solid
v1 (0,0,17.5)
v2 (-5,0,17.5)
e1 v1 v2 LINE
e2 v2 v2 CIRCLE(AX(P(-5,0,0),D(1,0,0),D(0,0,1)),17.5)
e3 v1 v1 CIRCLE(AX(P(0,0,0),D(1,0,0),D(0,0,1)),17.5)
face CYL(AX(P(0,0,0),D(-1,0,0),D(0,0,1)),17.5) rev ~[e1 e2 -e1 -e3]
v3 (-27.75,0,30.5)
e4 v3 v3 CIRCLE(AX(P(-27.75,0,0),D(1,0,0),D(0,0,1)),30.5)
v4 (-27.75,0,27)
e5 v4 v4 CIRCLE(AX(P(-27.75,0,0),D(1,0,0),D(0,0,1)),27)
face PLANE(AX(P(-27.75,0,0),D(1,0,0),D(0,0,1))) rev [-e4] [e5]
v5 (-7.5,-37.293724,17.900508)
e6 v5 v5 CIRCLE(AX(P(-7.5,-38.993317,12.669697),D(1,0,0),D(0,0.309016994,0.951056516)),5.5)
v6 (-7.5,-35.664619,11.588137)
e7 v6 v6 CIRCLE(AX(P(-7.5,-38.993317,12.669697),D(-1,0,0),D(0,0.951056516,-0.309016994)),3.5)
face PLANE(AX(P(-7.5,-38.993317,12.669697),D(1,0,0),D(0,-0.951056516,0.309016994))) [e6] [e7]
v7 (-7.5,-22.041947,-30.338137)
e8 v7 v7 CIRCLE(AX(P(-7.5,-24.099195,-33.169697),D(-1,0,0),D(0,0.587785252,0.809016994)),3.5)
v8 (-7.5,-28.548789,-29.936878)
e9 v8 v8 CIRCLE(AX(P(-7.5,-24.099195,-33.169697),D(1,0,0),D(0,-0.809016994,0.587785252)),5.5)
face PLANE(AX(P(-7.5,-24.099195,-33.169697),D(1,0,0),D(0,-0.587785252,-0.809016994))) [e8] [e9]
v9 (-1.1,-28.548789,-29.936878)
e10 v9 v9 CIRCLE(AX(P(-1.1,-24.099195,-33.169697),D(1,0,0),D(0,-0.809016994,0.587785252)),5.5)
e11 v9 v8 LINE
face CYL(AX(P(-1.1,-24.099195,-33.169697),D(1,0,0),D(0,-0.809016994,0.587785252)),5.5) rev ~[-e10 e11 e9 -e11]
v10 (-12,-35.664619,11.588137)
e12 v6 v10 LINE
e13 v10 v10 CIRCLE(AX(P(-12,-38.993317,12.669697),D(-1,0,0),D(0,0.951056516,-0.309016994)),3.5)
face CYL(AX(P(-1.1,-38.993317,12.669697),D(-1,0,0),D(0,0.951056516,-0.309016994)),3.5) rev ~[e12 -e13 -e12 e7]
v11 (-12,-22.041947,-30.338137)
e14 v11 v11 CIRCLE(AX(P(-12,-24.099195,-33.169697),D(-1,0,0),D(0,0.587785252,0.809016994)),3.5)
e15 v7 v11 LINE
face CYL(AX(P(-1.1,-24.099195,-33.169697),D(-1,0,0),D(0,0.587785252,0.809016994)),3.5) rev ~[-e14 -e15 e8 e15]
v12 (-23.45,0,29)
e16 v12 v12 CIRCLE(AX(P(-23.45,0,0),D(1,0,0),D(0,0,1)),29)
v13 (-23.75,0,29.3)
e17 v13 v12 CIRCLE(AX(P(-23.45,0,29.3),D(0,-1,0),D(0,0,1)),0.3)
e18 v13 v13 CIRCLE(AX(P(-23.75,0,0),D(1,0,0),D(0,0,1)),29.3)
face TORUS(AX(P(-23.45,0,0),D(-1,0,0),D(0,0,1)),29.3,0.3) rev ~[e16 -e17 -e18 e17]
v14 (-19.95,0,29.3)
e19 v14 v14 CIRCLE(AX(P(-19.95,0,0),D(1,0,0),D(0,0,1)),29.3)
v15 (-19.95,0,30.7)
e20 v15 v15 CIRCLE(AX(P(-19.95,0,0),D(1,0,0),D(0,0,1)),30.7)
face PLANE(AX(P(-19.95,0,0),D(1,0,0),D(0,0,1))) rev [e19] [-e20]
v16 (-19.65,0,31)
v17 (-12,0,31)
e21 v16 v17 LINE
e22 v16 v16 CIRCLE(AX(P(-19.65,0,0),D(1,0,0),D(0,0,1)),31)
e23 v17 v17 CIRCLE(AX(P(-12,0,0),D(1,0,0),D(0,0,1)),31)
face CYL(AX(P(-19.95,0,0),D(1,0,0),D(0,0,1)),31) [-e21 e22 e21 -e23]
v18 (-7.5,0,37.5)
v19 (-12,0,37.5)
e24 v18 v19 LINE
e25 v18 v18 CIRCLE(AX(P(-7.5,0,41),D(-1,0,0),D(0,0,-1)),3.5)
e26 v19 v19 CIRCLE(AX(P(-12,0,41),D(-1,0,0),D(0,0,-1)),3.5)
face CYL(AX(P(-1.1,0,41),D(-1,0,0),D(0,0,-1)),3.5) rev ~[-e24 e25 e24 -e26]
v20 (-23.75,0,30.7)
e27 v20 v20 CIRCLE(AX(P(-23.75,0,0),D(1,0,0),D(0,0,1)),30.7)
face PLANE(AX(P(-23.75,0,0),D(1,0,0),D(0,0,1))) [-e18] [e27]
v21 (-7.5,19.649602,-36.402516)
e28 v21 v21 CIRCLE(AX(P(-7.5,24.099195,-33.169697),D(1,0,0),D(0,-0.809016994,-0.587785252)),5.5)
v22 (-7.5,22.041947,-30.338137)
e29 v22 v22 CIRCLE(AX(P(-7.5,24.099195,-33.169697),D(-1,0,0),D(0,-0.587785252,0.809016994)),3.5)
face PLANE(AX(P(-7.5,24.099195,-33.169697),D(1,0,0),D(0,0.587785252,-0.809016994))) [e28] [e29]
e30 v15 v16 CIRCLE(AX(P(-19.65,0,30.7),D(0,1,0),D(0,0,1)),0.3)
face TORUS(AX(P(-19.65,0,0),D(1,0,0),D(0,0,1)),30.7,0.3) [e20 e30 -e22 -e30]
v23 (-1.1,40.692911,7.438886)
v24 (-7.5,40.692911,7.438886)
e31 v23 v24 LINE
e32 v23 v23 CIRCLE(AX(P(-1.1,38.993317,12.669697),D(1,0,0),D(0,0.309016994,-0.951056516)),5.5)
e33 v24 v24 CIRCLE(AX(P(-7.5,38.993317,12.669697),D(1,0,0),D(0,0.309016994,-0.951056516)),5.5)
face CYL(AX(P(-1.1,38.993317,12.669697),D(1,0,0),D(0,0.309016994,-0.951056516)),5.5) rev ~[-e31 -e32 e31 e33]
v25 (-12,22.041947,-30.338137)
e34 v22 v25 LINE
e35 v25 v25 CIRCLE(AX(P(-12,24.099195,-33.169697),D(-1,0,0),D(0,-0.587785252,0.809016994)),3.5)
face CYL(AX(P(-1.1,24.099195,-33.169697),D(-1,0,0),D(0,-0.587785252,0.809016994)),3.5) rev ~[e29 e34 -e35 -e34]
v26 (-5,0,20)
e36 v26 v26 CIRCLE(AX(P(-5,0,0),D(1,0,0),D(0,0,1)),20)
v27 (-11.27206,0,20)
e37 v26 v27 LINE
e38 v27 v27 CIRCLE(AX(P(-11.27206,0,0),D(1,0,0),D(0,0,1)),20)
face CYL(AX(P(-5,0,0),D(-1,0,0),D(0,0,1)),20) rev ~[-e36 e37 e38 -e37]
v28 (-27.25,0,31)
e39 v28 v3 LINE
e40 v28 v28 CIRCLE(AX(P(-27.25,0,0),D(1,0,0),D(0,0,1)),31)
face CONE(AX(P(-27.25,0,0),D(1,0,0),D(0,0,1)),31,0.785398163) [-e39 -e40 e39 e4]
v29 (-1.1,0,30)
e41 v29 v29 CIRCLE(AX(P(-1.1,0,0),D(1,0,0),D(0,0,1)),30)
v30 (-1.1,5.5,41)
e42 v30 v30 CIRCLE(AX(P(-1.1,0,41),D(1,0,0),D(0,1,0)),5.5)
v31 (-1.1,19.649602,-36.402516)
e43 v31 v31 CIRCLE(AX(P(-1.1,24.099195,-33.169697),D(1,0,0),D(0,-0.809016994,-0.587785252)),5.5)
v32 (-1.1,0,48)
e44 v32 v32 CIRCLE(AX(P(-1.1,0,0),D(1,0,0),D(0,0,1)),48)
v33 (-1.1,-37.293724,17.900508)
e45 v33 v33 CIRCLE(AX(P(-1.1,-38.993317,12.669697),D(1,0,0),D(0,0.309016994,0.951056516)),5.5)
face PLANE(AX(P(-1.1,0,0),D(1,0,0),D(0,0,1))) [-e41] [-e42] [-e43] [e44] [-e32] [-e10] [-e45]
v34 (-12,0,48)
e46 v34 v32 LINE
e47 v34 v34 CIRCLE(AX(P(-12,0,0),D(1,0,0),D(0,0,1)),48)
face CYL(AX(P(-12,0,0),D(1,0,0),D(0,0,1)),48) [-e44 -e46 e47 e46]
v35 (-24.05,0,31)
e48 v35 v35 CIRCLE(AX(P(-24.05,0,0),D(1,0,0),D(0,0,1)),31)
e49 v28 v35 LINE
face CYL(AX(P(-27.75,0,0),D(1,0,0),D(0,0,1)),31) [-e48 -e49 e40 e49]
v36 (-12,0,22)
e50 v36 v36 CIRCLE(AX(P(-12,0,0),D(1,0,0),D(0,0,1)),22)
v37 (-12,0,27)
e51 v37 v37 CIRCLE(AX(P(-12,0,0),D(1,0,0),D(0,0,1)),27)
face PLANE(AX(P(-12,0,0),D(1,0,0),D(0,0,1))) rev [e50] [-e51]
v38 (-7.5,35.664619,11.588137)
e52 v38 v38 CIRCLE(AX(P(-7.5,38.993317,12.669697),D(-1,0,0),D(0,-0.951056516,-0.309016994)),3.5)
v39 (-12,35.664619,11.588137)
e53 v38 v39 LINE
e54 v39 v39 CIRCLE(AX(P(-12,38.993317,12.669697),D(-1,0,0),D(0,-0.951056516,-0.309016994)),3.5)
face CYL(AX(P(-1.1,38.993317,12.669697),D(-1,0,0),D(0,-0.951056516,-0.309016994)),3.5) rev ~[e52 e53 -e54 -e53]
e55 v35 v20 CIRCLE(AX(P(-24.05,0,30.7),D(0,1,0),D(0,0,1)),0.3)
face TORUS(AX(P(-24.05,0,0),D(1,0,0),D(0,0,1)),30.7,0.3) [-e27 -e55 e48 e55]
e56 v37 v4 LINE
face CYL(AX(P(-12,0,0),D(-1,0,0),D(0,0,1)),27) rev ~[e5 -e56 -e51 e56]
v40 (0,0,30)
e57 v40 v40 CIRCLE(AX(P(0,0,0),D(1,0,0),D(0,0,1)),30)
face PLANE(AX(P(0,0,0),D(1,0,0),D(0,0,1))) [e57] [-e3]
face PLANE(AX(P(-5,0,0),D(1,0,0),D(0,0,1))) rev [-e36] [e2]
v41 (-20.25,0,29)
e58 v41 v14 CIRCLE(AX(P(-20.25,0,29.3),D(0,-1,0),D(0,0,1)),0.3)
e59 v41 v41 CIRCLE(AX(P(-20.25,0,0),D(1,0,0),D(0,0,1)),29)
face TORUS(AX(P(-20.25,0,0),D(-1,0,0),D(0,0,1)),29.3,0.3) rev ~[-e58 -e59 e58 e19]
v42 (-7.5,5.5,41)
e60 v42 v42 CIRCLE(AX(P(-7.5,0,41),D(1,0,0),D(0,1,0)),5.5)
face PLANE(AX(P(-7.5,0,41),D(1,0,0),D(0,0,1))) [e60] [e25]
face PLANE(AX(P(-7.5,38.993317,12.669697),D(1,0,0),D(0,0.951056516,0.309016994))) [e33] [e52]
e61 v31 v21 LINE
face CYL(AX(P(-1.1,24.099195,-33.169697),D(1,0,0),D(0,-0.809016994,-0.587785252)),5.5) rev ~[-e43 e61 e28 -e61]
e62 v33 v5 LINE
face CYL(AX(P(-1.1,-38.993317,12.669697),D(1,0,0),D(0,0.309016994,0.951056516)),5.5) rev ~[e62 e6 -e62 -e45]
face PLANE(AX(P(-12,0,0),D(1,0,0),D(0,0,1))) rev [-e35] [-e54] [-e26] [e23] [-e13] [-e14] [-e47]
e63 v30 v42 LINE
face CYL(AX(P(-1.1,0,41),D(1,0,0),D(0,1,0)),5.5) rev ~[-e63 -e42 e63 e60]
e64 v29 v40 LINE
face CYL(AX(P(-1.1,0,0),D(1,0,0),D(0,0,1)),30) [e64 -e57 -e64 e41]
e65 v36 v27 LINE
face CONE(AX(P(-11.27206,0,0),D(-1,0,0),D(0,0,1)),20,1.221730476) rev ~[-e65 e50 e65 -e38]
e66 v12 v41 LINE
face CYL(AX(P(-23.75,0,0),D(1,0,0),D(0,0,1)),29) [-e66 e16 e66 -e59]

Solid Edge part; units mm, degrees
sketch "Sketch1" plane through (0, 0, 0) normal (0, -1, 0) x (1, 0, 0)
  line L0 (-5, 20) -> (-12, 20)
  line L1 (-12, 20) -> (-12, 27)
  line L2 (-12, 27) -> (-27.75, 27)
  line L3 (-27.75, 27) -> (-27.75, 31)
  line L4 (-27.75, 31) -> (-23.75, 31)
  line L5 (-23.75, 31) -> (-23.75, 29)
  line L6 (-23.75, 29) -> (-19.95, 29)
  line L7 (-19.95, 29) -> (-19.95, 31)
  line L8 (-19.95, 31) -> (-12, 31)
  line L9 (-12, 31) -> (-12, 48)
  line L10 (-12, 48) -> (-1.1, 48)
  line L11 (-1.1, 48) -> (-1.1, 30)
  line L12 (-1.1, 30) -> (0, 30)
  line L13 (0, 30) -> (0, 17.5)
  line L14 (0, 17.5) -> (-5, 17.5)
  line L15 (-5, 17.5) -> (-5, 20)
revolve "RevolvedProtrusion1" add sketch "Sketch1" angle 360 about axis through (0, 0, 0) along (1, 0, 0)
chamfer "Chamfer_1" distance 2 angle 20 1 edges at (-12, 0, -20) measured on face at (-12, 17.46, 18.54)
fillet "Round_1" radius 0.3 4 edges at (-19.95, 0, -31) (-23.75, 0, -31) (-19.95, 0, -29) (-23.75, 0, -29)
chamfer "Chamfer_2" distance 0.5 angle 45 1 edges at (-27.75, 0, -31)
pattern "Pattern1" [suppressed]
hole "Hole_4" at (-1.1, 0, 41) direction (-1, 0, 0) diameter 7 depth 50.8
pattern_circular "Pattern2" count 5 over 360 about axis through (-1.1, 0, 0) along (-1, 0, 0) of "Hole_4"
sketch "Sketch2" plane through (-1.1, 0, 0) normal (1, 0, 0) x (0, 1, 0)
  circle A0 centre (0, 41) radius 5.5
extrude "ExtrudedCutout_1" cut sketch "Sketch2" against normal blind 6.4
pattern_circular "Pattern3" count 5 over 360 about axis through (-1.1, 0, 0) along (-1, 0, 0) of "ExtrudedCutout_1"
